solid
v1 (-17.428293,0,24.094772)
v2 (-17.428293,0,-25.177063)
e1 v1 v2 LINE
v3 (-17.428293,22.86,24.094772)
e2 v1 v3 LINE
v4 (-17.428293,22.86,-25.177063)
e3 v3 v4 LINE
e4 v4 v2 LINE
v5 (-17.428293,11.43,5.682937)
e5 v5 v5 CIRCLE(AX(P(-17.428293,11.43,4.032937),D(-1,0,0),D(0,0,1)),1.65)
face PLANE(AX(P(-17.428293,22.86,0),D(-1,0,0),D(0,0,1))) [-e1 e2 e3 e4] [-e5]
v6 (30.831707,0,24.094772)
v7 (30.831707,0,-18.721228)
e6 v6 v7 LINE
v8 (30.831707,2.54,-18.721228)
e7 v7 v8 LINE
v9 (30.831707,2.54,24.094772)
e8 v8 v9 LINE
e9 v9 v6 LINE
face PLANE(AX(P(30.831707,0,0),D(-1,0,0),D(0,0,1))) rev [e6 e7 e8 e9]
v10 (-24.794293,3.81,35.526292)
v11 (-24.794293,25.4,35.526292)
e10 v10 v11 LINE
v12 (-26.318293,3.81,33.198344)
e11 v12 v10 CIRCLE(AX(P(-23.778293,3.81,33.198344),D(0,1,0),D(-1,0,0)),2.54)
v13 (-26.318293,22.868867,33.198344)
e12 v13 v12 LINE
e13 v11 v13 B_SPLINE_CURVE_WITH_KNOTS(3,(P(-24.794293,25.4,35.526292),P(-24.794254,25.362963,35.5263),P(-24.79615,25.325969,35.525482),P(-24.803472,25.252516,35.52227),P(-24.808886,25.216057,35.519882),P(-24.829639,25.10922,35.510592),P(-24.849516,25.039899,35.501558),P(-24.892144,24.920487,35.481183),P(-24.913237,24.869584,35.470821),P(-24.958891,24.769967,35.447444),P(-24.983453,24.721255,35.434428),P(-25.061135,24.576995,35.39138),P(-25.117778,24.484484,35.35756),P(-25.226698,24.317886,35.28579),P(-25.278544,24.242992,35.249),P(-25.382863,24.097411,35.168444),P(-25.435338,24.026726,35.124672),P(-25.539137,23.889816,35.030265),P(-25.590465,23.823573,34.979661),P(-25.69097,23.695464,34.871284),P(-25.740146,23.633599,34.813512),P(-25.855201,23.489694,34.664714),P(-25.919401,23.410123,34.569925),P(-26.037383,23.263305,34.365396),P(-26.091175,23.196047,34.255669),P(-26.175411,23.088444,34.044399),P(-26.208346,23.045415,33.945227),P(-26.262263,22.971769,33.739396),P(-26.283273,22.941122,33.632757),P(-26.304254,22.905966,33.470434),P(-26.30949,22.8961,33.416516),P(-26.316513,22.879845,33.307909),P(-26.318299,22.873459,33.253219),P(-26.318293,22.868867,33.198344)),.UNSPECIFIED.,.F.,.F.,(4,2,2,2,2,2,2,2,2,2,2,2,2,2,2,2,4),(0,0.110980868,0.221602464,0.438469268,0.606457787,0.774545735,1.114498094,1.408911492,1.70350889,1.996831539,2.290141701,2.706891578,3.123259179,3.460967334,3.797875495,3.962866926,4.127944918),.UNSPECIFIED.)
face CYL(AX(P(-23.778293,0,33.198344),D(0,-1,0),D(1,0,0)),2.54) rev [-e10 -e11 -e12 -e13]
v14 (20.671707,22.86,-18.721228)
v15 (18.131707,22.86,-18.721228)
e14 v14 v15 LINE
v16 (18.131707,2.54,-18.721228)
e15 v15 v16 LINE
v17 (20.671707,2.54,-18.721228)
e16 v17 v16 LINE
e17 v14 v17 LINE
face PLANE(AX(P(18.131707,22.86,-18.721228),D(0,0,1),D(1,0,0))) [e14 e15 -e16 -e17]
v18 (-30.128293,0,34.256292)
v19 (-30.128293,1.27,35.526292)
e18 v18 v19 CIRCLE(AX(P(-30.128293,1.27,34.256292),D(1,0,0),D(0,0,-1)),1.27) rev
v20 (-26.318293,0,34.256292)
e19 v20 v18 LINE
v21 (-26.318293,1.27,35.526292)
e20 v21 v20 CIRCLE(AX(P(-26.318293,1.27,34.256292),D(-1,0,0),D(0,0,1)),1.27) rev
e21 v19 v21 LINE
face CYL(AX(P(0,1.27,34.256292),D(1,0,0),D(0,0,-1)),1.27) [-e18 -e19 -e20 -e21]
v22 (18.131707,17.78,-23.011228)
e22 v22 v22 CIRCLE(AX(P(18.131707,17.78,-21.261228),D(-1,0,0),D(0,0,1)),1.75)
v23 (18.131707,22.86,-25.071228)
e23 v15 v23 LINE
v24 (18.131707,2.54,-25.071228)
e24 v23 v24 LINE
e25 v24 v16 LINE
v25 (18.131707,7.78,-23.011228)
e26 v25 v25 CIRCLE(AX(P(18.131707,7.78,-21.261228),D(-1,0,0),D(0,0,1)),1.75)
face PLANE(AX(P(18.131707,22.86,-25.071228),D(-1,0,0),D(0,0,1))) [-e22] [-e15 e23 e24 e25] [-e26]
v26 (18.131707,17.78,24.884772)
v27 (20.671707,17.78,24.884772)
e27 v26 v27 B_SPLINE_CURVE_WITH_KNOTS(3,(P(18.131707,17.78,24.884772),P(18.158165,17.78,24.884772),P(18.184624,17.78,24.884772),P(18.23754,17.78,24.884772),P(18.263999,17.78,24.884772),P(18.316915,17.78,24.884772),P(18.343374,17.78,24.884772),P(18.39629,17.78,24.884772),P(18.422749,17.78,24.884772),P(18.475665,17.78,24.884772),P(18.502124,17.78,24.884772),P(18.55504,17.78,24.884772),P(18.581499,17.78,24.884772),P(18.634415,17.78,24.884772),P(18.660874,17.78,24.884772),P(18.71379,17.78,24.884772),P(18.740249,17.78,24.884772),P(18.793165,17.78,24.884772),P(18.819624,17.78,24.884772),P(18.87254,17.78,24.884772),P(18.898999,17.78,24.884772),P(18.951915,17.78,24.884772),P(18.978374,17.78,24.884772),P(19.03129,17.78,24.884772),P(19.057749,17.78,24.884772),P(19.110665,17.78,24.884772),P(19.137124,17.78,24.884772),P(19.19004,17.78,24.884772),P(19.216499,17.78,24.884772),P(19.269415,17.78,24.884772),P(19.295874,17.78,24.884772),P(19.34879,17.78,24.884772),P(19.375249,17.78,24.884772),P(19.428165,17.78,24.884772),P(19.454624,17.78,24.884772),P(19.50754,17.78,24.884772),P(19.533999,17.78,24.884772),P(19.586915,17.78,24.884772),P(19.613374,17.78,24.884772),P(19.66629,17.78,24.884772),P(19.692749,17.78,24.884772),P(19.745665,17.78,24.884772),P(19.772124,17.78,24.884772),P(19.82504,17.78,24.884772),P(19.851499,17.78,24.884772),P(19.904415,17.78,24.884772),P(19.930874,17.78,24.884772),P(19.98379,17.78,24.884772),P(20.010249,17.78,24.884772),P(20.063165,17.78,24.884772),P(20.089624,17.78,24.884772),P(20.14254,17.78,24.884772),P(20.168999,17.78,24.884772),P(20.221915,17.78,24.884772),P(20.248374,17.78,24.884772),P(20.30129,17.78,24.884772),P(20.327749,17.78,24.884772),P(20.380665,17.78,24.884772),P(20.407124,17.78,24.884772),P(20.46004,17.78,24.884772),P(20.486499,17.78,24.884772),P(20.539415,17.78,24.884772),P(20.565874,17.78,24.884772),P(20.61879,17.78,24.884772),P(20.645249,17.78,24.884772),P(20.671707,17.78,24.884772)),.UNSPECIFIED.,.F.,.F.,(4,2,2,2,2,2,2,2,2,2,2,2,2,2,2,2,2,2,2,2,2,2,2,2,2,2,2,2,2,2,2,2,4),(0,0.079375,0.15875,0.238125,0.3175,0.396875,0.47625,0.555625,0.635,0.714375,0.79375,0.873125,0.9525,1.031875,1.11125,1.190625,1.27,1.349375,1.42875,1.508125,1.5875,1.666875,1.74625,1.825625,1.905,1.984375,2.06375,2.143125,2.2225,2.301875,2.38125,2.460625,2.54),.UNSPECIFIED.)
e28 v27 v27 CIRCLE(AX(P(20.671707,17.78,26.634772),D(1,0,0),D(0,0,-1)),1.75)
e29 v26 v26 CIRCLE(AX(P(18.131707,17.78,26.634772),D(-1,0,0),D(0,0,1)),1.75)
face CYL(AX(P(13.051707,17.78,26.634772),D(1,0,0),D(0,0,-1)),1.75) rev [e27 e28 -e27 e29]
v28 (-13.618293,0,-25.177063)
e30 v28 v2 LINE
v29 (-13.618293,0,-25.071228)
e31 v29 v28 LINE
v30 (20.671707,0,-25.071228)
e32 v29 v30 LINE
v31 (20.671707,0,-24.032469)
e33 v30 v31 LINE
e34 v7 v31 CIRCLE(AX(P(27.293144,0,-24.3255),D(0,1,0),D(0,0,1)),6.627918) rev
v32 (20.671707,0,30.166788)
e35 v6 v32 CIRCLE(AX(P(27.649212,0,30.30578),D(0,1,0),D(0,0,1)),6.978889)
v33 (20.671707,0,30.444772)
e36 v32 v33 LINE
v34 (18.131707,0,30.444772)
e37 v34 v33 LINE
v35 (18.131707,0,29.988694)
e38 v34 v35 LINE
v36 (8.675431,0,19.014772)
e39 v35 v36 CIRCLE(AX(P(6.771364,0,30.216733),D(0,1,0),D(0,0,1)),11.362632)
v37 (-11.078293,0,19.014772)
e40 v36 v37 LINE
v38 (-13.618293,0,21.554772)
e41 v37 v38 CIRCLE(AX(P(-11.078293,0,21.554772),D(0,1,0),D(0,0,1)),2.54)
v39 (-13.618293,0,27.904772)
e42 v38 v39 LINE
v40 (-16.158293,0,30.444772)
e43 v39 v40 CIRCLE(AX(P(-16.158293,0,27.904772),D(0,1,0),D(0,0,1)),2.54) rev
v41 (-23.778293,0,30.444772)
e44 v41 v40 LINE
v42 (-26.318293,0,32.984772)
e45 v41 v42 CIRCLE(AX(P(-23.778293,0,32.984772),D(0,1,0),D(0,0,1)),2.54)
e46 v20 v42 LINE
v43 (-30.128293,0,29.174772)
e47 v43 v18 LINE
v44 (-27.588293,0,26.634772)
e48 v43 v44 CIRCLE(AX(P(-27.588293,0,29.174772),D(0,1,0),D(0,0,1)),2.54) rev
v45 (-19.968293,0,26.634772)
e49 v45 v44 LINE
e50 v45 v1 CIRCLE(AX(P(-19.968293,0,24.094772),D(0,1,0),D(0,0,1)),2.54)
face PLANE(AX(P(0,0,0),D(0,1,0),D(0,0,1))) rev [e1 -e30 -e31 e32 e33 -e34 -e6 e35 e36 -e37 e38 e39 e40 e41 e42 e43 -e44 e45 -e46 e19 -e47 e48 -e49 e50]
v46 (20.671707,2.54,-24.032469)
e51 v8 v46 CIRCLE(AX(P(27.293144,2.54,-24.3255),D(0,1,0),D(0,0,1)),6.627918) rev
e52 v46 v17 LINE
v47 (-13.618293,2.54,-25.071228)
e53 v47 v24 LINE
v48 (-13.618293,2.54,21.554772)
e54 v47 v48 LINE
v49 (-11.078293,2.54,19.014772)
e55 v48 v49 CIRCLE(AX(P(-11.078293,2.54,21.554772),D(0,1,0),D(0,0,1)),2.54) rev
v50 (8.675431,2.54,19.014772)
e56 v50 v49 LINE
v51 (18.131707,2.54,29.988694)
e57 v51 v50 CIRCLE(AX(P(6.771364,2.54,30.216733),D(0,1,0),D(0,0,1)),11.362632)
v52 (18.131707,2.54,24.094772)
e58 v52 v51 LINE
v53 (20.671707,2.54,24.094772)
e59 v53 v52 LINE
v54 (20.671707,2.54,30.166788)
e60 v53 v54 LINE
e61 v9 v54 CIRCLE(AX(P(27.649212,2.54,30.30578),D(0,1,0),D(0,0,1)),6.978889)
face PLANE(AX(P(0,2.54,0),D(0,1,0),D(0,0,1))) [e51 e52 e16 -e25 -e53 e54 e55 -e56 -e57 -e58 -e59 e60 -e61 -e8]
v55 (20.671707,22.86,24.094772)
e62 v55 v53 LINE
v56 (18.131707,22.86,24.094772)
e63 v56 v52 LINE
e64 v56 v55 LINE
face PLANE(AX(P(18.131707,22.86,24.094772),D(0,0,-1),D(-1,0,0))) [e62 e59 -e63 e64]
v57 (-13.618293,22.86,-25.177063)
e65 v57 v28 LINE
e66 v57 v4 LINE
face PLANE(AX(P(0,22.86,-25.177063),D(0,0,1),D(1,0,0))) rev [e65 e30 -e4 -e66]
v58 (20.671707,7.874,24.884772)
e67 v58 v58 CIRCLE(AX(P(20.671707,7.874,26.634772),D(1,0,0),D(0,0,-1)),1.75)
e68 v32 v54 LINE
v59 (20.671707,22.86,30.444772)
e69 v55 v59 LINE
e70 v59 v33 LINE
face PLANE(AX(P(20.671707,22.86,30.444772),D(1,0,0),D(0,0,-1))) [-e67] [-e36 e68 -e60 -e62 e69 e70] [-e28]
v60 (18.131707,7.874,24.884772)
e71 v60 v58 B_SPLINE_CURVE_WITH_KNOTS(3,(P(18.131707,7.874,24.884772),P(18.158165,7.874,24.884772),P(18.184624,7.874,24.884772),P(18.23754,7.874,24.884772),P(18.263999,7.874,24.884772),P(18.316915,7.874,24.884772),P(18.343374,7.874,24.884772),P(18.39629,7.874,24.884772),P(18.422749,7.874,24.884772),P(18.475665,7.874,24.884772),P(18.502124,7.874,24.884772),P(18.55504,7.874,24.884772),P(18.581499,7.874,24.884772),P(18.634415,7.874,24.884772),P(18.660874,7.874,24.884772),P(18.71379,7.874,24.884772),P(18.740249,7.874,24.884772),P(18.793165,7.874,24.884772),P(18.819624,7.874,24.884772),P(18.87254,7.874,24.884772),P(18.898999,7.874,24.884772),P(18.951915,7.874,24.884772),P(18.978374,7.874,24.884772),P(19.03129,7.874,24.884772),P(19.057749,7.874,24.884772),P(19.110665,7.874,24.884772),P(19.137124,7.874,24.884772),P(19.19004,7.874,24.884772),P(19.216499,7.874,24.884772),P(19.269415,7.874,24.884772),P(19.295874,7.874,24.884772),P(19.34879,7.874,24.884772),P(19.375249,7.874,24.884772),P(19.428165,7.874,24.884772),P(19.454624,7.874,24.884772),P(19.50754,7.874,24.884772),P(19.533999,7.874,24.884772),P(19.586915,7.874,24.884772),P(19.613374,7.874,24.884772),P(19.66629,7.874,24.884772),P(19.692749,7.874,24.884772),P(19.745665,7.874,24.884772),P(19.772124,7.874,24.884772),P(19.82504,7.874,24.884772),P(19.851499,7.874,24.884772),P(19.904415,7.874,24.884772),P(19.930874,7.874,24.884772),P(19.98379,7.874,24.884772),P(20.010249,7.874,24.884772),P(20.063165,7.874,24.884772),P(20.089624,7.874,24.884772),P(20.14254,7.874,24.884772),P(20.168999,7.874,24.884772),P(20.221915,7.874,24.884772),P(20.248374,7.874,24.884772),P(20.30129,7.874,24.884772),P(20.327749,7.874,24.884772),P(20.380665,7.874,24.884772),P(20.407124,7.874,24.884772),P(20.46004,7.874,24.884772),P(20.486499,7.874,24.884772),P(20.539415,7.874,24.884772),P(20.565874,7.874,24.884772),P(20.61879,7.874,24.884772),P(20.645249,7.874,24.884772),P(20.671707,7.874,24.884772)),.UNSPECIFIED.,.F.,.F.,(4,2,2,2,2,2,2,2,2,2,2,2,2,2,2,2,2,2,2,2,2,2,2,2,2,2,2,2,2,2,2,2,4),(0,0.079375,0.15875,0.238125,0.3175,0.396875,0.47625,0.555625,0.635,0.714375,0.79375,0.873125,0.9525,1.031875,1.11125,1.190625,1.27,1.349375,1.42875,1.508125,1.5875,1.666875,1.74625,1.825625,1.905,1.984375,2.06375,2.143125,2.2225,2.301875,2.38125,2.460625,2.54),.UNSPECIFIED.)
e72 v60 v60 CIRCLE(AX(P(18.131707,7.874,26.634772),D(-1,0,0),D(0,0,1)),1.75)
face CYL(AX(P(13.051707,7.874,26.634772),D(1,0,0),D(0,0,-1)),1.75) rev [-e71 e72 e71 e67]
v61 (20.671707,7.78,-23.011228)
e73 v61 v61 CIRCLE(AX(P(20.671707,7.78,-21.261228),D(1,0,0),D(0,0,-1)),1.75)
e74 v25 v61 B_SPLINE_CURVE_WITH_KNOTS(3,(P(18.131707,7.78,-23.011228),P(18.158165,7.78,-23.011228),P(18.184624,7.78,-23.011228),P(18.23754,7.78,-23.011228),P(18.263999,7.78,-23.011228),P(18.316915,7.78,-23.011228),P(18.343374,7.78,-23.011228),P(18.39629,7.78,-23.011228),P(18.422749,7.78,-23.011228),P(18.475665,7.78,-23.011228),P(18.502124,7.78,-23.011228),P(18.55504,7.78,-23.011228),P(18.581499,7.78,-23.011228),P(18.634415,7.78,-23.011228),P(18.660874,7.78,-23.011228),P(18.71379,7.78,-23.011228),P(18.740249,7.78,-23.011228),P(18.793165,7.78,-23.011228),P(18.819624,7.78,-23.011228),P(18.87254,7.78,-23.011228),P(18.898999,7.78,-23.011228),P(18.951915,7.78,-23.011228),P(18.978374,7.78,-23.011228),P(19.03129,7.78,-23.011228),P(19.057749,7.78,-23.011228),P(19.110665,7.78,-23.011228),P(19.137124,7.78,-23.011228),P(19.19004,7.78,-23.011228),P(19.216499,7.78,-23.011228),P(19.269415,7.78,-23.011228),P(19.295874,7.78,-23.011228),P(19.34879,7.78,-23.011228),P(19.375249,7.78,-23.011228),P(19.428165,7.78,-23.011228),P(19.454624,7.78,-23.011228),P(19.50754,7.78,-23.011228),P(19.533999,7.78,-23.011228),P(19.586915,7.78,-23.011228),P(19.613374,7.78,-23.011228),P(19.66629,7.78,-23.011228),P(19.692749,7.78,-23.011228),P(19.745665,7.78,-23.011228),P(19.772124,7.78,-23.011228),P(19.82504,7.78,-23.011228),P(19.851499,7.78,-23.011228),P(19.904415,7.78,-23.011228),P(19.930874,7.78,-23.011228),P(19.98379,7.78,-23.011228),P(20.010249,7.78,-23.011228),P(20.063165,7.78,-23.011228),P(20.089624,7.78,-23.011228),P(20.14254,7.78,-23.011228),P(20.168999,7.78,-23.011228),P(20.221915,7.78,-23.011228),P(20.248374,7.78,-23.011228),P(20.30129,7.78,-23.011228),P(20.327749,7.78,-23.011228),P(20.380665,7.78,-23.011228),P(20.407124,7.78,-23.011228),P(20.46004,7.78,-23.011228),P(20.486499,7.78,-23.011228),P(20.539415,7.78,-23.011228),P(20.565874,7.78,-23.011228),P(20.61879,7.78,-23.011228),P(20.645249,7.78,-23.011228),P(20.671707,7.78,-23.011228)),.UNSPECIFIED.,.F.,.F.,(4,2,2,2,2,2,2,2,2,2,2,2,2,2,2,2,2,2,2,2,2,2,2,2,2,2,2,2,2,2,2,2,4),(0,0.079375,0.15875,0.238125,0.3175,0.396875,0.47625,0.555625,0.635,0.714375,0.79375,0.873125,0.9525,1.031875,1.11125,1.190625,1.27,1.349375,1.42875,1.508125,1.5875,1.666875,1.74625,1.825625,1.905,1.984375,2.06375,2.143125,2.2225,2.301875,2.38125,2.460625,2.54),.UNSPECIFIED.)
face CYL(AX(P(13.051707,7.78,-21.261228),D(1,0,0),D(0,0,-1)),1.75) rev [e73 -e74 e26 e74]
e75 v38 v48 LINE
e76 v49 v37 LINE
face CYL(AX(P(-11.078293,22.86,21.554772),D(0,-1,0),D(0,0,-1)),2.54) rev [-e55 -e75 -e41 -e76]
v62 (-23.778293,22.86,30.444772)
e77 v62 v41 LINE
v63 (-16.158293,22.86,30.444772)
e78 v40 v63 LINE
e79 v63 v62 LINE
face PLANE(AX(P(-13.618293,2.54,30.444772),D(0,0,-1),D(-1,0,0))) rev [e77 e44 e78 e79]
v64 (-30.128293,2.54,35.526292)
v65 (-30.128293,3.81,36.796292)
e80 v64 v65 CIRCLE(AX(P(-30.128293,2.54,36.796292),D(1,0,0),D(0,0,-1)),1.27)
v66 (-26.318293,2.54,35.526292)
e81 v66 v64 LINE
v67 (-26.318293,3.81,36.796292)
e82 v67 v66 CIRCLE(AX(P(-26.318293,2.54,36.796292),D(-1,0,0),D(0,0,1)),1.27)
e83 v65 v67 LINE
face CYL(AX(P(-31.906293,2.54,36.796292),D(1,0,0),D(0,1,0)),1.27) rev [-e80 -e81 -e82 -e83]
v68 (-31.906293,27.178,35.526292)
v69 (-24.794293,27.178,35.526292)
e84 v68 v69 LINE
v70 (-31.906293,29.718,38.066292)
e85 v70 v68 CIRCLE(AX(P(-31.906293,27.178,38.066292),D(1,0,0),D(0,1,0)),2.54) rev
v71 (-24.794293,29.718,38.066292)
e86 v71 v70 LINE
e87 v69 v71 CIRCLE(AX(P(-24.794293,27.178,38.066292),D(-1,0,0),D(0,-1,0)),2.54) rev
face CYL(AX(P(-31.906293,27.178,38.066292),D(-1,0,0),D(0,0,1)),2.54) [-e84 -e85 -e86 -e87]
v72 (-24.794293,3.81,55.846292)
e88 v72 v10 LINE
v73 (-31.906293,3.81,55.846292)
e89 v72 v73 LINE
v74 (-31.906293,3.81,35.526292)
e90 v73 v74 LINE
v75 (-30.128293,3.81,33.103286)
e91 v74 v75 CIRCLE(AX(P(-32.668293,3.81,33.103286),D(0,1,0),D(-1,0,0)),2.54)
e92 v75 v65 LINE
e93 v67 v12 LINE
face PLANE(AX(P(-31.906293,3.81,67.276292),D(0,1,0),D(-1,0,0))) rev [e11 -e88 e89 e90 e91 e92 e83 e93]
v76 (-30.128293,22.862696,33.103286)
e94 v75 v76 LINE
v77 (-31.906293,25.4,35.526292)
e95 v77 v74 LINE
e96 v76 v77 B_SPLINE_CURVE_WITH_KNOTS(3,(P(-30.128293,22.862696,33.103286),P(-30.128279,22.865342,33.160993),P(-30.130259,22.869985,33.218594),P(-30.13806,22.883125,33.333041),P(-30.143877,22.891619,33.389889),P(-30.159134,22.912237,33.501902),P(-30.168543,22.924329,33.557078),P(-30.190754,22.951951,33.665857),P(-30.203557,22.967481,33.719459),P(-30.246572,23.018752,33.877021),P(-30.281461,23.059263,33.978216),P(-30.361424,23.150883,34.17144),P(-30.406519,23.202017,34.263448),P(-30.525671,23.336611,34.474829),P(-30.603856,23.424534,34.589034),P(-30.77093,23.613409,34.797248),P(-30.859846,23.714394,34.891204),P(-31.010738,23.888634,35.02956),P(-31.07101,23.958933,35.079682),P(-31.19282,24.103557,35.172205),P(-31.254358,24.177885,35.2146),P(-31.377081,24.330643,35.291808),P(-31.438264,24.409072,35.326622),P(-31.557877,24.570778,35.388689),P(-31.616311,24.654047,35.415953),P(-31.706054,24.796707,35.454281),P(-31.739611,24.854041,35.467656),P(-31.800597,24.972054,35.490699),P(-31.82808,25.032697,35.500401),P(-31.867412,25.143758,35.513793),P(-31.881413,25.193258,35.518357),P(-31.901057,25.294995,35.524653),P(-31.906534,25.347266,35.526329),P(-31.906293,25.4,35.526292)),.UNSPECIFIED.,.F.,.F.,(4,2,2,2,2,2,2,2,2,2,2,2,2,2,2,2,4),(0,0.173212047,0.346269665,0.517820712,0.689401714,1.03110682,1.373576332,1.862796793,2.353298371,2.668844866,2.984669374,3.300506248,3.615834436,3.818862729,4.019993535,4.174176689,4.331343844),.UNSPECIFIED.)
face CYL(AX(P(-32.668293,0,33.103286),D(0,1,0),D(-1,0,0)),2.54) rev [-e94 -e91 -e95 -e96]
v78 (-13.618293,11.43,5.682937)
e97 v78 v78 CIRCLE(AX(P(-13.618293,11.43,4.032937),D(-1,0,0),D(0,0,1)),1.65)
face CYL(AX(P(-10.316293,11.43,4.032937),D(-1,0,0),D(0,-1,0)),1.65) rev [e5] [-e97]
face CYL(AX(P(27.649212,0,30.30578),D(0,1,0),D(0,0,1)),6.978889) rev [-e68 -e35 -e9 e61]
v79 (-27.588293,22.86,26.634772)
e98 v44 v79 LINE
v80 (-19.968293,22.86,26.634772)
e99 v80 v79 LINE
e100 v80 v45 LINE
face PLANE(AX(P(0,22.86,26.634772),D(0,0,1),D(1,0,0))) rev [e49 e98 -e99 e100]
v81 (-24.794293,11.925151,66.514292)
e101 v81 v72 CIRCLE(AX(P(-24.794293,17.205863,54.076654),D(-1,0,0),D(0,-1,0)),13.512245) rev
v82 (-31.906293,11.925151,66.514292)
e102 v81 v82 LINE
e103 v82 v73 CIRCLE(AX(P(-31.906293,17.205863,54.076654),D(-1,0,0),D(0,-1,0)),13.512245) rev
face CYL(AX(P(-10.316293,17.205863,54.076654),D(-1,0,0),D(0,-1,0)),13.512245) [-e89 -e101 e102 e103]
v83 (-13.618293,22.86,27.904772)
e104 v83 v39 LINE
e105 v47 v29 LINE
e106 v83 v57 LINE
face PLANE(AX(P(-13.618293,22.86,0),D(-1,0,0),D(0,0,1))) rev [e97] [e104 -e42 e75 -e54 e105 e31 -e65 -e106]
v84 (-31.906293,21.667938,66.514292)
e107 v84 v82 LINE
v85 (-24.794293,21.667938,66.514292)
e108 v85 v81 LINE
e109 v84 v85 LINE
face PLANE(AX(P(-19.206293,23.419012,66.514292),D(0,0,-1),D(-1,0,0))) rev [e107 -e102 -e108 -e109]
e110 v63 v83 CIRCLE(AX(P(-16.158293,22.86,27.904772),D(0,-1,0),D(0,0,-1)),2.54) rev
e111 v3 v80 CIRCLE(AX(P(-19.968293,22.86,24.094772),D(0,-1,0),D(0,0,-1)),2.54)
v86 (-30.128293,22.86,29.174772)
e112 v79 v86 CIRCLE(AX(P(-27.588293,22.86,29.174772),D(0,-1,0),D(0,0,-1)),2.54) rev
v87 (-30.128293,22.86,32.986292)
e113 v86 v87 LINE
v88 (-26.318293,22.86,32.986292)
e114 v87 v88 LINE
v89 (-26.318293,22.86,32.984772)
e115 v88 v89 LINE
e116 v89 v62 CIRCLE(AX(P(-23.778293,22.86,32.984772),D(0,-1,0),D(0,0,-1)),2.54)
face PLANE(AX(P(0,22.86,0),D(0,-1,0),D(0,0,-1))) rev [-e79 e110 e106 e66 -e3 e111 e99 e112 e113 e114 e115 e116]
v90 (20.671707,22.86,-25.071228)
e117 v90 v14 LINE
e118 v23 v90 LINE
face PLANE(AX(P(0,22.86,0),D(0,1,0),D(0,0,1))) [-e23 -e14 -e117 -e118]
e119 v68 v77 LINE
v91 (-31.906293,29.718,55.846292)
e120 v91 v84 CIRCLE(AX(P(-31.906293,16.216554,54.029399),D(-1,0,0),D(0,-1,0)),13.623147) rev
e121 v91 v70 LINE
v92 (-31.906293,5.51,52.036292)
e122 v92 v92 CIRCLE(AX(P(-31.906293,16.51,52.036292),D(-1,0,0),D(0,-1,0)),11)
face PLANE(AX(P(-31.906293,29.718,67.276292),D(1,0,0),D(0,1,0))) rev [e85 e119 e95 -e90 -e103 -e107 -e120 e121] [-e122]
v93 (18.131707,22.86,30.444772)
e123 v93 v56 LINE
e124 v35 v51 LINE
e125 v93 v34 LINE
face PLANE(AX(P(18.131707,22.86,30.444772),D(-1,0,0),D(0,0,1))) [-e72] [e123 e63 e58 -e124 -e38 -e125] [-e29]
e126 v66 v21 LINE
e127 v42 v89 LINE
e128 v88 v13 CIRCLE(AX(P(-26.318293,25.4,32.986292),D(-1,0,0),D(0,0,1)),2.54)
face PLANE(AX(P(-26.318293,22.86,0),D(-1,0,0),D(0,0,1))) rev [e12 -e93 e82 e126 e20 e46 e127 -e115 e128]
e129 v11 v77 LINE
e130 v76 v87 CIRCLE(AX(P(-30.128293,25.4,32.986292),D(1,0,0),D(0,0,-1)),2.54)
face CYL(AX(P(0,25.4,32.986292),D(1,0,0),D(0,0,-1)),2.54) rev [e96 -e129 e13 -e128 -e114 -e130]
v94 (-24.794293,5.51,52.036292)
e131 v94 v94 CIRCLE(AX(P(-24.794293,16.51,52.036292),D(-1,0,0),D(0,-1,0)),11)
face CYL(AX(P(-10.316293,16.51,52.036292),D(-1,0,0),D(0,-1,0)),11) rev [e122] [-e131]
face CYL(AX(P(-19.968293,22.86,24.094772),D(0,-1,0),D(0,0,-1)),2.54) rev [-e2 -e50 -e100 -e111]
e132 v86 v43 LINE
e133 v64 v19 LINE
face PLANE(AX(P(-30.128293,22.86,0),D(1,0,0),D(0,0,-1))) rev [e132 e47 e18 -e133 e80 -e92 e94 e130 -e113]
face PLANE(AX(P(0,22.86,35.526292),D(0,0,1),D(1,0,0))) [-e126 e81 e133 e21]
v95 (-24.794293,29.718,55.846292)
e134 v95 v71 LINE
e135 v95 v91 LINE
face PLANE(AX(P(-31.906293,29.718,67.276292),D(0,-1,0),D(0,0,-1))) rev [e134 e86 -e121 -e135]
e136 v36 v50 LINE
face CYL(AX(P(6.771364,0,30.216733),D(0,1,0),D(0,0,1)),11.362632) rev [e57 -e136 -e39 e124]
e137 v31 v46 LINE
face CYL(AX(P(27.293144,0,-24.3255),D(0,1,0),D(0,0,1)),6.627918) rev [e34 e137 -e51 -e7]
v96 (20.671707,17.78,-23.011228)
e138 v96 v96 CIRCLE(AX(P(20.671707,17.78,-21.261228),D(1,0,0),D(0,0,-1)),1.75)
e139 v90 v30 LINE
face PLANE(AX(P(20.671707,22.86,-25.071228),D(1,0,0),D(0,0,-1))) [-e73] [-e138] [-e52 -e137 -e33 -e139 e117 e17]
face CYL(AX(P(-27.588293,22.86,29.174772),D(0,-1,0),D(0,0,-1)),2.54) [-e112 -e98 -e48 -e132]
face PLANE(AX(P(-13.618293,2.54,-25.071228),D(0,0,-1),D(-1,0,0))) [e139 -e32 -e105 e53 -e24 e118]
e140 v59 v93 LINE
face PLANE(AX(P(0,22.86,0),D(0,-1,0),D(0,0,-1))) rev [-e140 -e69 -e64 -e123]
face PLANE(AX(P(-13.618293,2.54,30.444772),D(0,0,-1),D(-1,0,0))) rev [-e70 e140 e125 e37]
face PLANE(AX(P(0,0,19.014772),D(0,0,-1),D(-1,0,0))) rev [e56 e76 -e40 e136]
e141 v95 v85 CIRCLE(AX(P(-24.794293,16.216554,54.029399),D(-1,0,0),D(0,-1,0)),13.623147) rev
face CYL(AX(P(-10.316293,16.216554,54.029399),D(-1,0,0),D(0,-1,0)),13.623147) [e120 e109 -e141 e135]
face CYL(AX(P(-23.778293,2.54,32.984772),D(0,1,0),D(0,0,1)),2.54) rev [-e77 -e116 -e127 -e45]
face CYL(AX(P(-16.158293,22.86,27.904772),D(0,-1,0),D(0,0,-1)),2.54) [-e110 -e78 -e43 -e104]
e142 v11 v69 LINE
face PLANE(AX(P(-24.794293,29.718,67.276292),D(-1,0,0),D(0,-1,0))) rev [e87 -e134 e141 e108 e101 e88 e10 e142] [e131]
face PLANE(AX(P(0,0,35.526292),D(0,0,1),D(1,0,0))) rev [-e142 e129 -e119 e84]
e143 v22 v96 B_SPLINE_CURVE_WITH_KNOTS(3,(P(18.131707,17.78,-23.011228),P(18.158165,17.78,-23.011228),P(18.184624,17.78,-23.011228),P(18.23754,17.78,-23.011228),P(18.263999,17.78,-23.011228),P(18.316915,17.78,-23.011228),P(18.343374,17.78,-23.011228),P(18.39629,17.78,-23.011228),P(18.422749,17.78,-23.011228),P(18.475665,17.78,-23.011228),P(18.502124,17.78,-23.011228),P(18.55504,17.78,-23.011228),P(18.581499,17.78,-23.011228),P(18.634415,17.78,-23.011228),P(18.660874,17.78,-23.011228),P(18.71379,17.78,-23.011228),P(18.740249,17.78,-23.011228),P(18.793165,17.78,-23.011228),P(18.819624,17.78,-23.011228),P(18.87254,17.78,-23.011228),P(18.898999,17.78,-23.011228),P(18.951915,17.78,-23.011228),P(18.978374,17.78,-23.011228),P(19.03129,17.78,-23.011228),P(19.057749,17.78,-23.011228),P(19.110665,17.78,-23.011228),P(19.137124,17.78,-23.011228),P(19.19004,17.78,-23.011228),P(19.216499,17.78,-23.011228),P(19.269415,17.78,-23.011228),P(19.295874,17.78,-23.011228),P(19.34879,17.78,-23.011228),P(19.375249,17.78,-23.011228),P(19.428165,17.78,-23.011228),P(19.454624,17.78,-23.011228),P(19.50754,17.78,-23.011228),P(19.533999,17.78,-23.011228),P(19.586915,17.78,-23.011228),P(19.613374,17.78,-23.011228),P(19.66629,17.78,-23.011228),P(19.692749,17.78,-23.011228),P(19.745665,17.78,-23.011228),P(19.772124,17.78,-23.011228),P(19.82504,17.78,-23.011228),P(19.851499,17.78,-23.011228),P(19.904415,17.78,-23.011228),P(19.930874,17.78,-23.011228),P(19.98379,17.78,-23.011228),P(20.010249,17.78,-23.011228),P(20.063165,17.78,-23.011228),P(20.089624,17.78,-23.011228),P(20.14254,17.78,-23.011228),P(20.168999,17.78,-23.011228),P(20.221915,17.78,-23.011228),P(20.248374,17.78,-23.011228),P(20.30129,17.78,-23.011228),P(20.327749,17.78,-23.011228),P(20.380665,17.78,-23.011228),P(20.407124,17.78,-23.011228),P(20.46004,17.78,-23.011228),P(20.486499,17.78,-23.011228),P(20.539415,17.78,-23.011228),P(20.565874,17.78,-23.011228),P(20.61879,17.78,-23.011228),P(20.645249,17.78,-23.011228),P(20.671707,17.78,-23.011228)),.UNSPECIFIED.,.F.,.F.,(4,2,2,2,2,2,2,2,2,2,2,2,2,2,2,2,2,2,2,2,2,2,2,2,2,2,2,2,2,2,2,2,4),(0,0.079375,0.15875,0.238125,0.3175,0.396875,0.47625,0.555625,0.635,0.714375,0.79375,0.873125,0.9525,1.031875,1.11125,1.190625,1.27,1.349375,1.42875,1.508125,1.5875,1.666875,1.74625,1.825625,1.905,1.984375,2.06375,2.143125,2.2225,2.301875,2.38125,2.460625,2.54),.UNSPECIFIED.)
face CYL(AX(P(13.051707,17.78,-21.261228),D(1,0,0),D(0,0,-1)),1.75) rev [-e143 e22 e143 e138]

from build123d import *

# Parameters (mm, degrees)
SKETCH1_W            = 31.75
SKETCH1_H            = 55.515999966
BOSS_EXTRUDE1_DEPTH  = 2.54
SKETCH10_W           = 8.89
SKETCH10_H           = 3.81
BOSS_EXTRUDE6_DEPTH  = 22.86
SKETCH12_W           = 7.112
SKETCH12_H           = 25.908
BOSS_EXTRUDE7_DEPTH  = 31.75
SKETCH13_R           = 11
SKETCH13_R_2         = 1.65
CUT_EXTRUDE5_DEPTH   = 21.59
SKETCH14_W           = 0.762
SKETCH14_H           = 14.055075912
CUT_EXTRUDE6_DEPTH   = 12.7
SKETCH15_W           = 2.54
SKETCH15_H           = 6.35
BOSS_EXTRUDE8_DEPTH  = 22.86
SKETCH16_R           = 1.750000056
CUT_EXTRUDE7_DEPTH   = 7.62
SKETCH17_W           = 42.815999966
SKETCH17_H           = 2.54
BOSS_EXTRUDE9_DEPTH  = 12.7
SKETCH18_W           = 5.08
SKETCH18_H           = 6.35
BOSS_EXTRUDE10_DEPTH = 2.54
CUT_EXTRUDE9_DEPTH   = 2.54
FILLET1_R            = 1.27
FILLET2_R            = 2.54
FILLET3_START        = 3.81
FILLET3_DEPTH        = 19.0499999
FILLET3_START_2      = 22.8599999
FILLET3_2_DEPTH      = 2.5400001
FILLET3_START_3      = -33
FILLET3_3_DEPTH      = 8.205718734


with BuildPart() as part:
    # Sketch1 → Boss-Extrude1 (new body)
    with BuildSketch(Plane(origin=(0, 0, 0), x_dir=(1, 0, 0), z_dir=(0, 1, 0))):
        with Locations((2.256707018, -2.686772311)):
            Rectangle(SKETCH1_W, SKETCH1_H)
    extrude(amount=BOSS_EXTRUDE1_DEPTH)

    # Sketch10 → Boss-Extrude6 (add)
    with BuildSketch(Plane(origin=(0, 0, 0), x_dir=(-1, 0, 0), z_dir=(0, -1, 0))):
        Polygon((13.618292982, 25.071227672), (13.618292982, -30.444772294), (17.428292982, -30.444772294), (17.428292982, -26.634772294), (17.428292982, 25.177062632), (13.618292982, 25.177062632), align=None)
        with Locations((21.873292982, -28.539772294)):
            Rectangle(SKETCH10_W, SKETCH10_H)
        Polygon((26.318292982, -26.634772294), (26.318292982, -30.444772294), (26.318292982, -35.526292066), (30.128292982, -35.526292066), (30.128292982, -26.634772294), align=None)
    extrude(amount=-BOSS_EXTRUDE6_DEPTH)

    # Sketch12 → Boss-Extrude7 (add)
    with BuildSketch(Plane.XY.offset(35.526292066)):
        with Locations((-28.350292982, 16.764)):
            Rectangle(SKETCH12_W, SKETCH12_H)
    extrude(amount=BOSS_EXTRUDE7_DEPTH)

    # Sketch13 → Cut-Extrude5 (cut)
    with BuildSketch(Plane.ZY.offset(31.906292982)):
        with BuildLine():
            Line((67.276292066, 3.81), (67.276292066, 14.316171348))
            ThreePointArc((67.276292066, 14.316171348), (63.220762226, 7.257694985), (55.846292066, 3.81))
            Line((55.846292066, 3.81), (67.276292066, 3.81))
        make_face()
        with BuildLine():
            ThreePointArc((55.846292066, 29.718), (63.159812447, 26.327226274), (67.276292066, 19.396171348))
            Line((67.276292066, 19.396171348), (67.276292066, 29.718))
            Line((67.276292066, 29.718), (55.846292066, 29.718))
        make_face()
        with Locations(Location((52.036292066, 16.51, 0), (0, 0, 270))):
            Circle(SKETCH13_R)
        with Locations((4.032937368, 11.43)):
            Circle(SKETCH13_R_2)
    extrude(amount=-CUT_EXTRUDE5_DEPTH, mode=Mode.SUBTRACT)

    # Sketch14 → Cut-Extrude6 (cut)
    with BuildSketch(Plane.ZY.offset(31.906292982)):
        with Locations((66.895292066, 16.391473574)):
            Rectangle(SKETCH14_W, SKETCH14_H)
    extrude(amount=-CUT_EXTRUDE6_DEPTH, mode=Mode.SUBTRACT)

    # Sketch15 → Boss-Extrude8 (add)
    with BuildSketch(Plane.XZ):
        with Locations((19.401707018, -21.896227672)):
            Rectangle(SKETCH15_W, SKETCH15_H)
        with Locations((19.401707018, 27.269772294)):
            Rectangle(SKETCH15_W, SKETCH15_H)
    extrude(amount=-BOSS_EXTRUDE8_DEPTH)

    # Sketch16 → Cut-Extrude7 (cut)
    with BuildSketch(Plane(origin=(20.671707018, 0, 0), x_dir=(0, 0, -1), z_dir=(1, 0, 0))):
        with Locations((-26.634772294, 7.874)):
            Circle(SKETCH16_R)
        with Locations((-26.634772294, 17.78)):
            Circle(SKETCH16_R)
        with Locations((21.261227672, 7.78)):
            Circle(SKETCH16_R)
        with Locations((21.261227672, 17.78)):
            Circle(SKETCH16_R)
    extrude(amount=-CUT_EXTRUDE7_DEPTH, mode=Mode.SUBTRACT)

    # Sketch17 → Boss-Extrude9 (add)
    with BuildSketch(Plane(origin=(18.131707018, 0, 0), x_dir=(0, 0, -1), z_dir=(1, 0, 0))):
        with Locations((-2.686772311, 1.27)):
            Rectangle(SKETCH17_W, SKETCH17_H)
    extrude(amount=BOSS_EXTRUDE9_DEPTH)

    # Sketch18 → Boss-Extrude10 (add)
    with BuildSketch(Plane(origin=(0, 2.54, 0), x_dir=(1, 0, 0), z_dir=(0, 1, 0))):
        with Locations((23.211707018, 21.896227672)):
            Rectangle(SKETCH18_W, SKETCH18_H)
        with Locations((23.211707018, -27.269772294)):
            Rectangle(SKETCH18_W, SKETCH18_H)
    extrude(amount=-BOSS_EXTRUDE10_DEPTH)

    # Sketch19 → Cut-Extrude9 (cut)
    with BuildSketch(Plane(origin=(0, 2.54, 0), x_dir=(1, 0, 0), z_dir=(0, 1, 0))):
        with BuildLine():
            Line((25.751707018, 25.071227672), (20.671707018, 25.071227672))
            Line((20.671707018, 25.071227672), (20.671707018, 24.618530893))
            Line((20.671707018, 24.618530893), (20.671707018, 24.032468758))
            ThreePointArc((20.671707018, 24.032468758), (21.560891333, 20.998252578), (23.754580952, 18.721227672))
            Line((23.754580952, 18.721227672), (25.751707018, 18.721227672))
            Line((25.751707018, 18.721227672), (25.751707018, 25.071227672))
        make_face()
        with BuildLine():
            Line((30.831707018, 18.721227672), (25.751707018, 18.721227672))
            Line((25.751707018, 18.721227672), (23.754580952, 18.721227672))
            ThreePointArc((23.754580952, 18.721227672), (27.293143985, 17.697581999), (30.831707018, 18.721227672))
        make_face()
        with BuildLine():
            ThreePointArc((18.131707018, -29.988694367), (15.379086377, -22.799421621), (8.675431219, -19.014772294))
            Line((8.675431219, -19.014772294), (-13.618292982, -19.014772294))
            Line((-13.618292982, -19.014772294), (-13.618292982, -30.444772294))
            Line((-13.618292982, -30.444772294), (18.131707018, -30.444772294))
            Line((18.131707018, -30.444772294), (18.131707018, -29.988694367))
        make_face()
        with BuildLine():
            Line((25.751707018, -24.094772294), (30.831707018, -24.094772294))
            ThreePointArc((30.831707018, -24.094772294), (24.069006733, -24.315202296), (20.671707018, -30.166788334))
            Line((20.671707018, -30.166788334), (20.671707018, -30.444772294))
            Line((20.671707018, -30.444772294), (25.751707018, -30.444772294))
            Line((25.751707018, -30.444772294), (25.751707018, -24.094772294))
        make_face()
    extrude(amount=-CUT_EXTRUDE9_DEPTH, mode=Mode.SUBTRACT)

    # Fillet1
    fillet1_edges = [part.edges().sort_by_distance(p)[0] for p in [
        (-28.223292982, 0, 35.526292066),
        (-28.223292982, 3.81, 35.526292066),
    ]]
    fillet(fillet1_edges, radius=FILLET1_R)

    # Fillet2
    fillet2_edges = [part.edges().sort_by_distance(p)[0] for p in [
        (-26.318292982, 11.43, 30.444772294),
        (-13.618292982, 11.43, 30.444772294),
        (-17.428292982, 11.43, 26.634772294),
        (-30.128292982, 11.43, 26.634772294),
        (-28.223292982, 22.86, 35.526292066),
        (-13.618292982, 1.27, 19.014772294),
        (-28.350292982, 29.718, 35.526292066),
    ]]
    fillet(fillet2_edges, radius=FILLET2_R)

    # Fillet3: read off the stored shape, not the designer's step
    # Fillet3 outline → Fillet3 (add)
    with BuildSketch(Plane(origin=(0, 0, 0), x_dir=(1, 0, 0), z_dir=(0, 1, 0)).offset(FILLET3_START)):
        with BuildLine():
            Line((-26.318292982, -35.526292066), (-24.794272712, -35.526300912))
            ThreePointArc((-24.794272712, -35.526300912), (-25.903403393, -34.589568161), (-26.318292982, -33.198343613))
            Line((-26.318292982, -33.198343613), (-26.318292982, -35.526292066))
        make_face()
        with BuildLine():
            Line((-31.906292982, -35.526292066), (-30.128292982, -35.526292066))
            Line((-30.128292982, -35.526292066), (-30.128292982, -33.103286494))
            ThreePointArc((-30.128292982, -33.103286494), (-30.620479514, -34.605970759), (-31.906292982, -35.526292066))
        make_face()
    extrude(amount=FILLET3_DEPTH)

    # Fillet3 2 outline → Fillet3 2 (add)
    with BuildSketch(Plane(origin=(0, 0, 0), x_dir=(1, 0, 0), z_dir=(0, 1, 0)).offset(FILLET3_START_2)):
        with BuildLine():
            Line((-26.318292982, -35.526292066), (-24.794272712, -35.526300912))
            ThreePointArc((-24.794272712, -35.526300912), (-25.903403393, -34.589568161), (-26.318292982, -33.198343613))
            Line((-26.318292982, -33.198343613), (-26.318292982, -35.526292066))
        make_face()
        with BuildLine():
            Line((-31.906292982, -35.526292066), (-30.128292982, -35.526292066))
            Line((-30.128292982, -35.526292066), (-30.128292982, -33.103286494))
            ThreePointArc((-30.128292982, -33.103286494), (-30.620479514, -34.605970759), (-31.906292982, -35.526292066))
        make_face()
    extrude(amount=FILLET3_2_DEPTH)

    # Fillet3 3 outline → Fillet3 3 (cut)
    with BuildSketch(Plane.YZ.offset(FILLET3_START_3)):
        with BuildLine():
            Line((25.4, 32), (25.4, 35.526292066))
            ThreePointArc((25.4, 35.526292066), (23.603948776, 34.78234329), (22.86, 32.986292066))
            Line((22.86, 32.986292066), (22.86, 32))
            Line((22.86, 32), (25.4, 32))
        make_face()
    extrude(amount=FILLET3_3_DEPTH, mode=Mode.SUBTRACT)


solid = part.part
